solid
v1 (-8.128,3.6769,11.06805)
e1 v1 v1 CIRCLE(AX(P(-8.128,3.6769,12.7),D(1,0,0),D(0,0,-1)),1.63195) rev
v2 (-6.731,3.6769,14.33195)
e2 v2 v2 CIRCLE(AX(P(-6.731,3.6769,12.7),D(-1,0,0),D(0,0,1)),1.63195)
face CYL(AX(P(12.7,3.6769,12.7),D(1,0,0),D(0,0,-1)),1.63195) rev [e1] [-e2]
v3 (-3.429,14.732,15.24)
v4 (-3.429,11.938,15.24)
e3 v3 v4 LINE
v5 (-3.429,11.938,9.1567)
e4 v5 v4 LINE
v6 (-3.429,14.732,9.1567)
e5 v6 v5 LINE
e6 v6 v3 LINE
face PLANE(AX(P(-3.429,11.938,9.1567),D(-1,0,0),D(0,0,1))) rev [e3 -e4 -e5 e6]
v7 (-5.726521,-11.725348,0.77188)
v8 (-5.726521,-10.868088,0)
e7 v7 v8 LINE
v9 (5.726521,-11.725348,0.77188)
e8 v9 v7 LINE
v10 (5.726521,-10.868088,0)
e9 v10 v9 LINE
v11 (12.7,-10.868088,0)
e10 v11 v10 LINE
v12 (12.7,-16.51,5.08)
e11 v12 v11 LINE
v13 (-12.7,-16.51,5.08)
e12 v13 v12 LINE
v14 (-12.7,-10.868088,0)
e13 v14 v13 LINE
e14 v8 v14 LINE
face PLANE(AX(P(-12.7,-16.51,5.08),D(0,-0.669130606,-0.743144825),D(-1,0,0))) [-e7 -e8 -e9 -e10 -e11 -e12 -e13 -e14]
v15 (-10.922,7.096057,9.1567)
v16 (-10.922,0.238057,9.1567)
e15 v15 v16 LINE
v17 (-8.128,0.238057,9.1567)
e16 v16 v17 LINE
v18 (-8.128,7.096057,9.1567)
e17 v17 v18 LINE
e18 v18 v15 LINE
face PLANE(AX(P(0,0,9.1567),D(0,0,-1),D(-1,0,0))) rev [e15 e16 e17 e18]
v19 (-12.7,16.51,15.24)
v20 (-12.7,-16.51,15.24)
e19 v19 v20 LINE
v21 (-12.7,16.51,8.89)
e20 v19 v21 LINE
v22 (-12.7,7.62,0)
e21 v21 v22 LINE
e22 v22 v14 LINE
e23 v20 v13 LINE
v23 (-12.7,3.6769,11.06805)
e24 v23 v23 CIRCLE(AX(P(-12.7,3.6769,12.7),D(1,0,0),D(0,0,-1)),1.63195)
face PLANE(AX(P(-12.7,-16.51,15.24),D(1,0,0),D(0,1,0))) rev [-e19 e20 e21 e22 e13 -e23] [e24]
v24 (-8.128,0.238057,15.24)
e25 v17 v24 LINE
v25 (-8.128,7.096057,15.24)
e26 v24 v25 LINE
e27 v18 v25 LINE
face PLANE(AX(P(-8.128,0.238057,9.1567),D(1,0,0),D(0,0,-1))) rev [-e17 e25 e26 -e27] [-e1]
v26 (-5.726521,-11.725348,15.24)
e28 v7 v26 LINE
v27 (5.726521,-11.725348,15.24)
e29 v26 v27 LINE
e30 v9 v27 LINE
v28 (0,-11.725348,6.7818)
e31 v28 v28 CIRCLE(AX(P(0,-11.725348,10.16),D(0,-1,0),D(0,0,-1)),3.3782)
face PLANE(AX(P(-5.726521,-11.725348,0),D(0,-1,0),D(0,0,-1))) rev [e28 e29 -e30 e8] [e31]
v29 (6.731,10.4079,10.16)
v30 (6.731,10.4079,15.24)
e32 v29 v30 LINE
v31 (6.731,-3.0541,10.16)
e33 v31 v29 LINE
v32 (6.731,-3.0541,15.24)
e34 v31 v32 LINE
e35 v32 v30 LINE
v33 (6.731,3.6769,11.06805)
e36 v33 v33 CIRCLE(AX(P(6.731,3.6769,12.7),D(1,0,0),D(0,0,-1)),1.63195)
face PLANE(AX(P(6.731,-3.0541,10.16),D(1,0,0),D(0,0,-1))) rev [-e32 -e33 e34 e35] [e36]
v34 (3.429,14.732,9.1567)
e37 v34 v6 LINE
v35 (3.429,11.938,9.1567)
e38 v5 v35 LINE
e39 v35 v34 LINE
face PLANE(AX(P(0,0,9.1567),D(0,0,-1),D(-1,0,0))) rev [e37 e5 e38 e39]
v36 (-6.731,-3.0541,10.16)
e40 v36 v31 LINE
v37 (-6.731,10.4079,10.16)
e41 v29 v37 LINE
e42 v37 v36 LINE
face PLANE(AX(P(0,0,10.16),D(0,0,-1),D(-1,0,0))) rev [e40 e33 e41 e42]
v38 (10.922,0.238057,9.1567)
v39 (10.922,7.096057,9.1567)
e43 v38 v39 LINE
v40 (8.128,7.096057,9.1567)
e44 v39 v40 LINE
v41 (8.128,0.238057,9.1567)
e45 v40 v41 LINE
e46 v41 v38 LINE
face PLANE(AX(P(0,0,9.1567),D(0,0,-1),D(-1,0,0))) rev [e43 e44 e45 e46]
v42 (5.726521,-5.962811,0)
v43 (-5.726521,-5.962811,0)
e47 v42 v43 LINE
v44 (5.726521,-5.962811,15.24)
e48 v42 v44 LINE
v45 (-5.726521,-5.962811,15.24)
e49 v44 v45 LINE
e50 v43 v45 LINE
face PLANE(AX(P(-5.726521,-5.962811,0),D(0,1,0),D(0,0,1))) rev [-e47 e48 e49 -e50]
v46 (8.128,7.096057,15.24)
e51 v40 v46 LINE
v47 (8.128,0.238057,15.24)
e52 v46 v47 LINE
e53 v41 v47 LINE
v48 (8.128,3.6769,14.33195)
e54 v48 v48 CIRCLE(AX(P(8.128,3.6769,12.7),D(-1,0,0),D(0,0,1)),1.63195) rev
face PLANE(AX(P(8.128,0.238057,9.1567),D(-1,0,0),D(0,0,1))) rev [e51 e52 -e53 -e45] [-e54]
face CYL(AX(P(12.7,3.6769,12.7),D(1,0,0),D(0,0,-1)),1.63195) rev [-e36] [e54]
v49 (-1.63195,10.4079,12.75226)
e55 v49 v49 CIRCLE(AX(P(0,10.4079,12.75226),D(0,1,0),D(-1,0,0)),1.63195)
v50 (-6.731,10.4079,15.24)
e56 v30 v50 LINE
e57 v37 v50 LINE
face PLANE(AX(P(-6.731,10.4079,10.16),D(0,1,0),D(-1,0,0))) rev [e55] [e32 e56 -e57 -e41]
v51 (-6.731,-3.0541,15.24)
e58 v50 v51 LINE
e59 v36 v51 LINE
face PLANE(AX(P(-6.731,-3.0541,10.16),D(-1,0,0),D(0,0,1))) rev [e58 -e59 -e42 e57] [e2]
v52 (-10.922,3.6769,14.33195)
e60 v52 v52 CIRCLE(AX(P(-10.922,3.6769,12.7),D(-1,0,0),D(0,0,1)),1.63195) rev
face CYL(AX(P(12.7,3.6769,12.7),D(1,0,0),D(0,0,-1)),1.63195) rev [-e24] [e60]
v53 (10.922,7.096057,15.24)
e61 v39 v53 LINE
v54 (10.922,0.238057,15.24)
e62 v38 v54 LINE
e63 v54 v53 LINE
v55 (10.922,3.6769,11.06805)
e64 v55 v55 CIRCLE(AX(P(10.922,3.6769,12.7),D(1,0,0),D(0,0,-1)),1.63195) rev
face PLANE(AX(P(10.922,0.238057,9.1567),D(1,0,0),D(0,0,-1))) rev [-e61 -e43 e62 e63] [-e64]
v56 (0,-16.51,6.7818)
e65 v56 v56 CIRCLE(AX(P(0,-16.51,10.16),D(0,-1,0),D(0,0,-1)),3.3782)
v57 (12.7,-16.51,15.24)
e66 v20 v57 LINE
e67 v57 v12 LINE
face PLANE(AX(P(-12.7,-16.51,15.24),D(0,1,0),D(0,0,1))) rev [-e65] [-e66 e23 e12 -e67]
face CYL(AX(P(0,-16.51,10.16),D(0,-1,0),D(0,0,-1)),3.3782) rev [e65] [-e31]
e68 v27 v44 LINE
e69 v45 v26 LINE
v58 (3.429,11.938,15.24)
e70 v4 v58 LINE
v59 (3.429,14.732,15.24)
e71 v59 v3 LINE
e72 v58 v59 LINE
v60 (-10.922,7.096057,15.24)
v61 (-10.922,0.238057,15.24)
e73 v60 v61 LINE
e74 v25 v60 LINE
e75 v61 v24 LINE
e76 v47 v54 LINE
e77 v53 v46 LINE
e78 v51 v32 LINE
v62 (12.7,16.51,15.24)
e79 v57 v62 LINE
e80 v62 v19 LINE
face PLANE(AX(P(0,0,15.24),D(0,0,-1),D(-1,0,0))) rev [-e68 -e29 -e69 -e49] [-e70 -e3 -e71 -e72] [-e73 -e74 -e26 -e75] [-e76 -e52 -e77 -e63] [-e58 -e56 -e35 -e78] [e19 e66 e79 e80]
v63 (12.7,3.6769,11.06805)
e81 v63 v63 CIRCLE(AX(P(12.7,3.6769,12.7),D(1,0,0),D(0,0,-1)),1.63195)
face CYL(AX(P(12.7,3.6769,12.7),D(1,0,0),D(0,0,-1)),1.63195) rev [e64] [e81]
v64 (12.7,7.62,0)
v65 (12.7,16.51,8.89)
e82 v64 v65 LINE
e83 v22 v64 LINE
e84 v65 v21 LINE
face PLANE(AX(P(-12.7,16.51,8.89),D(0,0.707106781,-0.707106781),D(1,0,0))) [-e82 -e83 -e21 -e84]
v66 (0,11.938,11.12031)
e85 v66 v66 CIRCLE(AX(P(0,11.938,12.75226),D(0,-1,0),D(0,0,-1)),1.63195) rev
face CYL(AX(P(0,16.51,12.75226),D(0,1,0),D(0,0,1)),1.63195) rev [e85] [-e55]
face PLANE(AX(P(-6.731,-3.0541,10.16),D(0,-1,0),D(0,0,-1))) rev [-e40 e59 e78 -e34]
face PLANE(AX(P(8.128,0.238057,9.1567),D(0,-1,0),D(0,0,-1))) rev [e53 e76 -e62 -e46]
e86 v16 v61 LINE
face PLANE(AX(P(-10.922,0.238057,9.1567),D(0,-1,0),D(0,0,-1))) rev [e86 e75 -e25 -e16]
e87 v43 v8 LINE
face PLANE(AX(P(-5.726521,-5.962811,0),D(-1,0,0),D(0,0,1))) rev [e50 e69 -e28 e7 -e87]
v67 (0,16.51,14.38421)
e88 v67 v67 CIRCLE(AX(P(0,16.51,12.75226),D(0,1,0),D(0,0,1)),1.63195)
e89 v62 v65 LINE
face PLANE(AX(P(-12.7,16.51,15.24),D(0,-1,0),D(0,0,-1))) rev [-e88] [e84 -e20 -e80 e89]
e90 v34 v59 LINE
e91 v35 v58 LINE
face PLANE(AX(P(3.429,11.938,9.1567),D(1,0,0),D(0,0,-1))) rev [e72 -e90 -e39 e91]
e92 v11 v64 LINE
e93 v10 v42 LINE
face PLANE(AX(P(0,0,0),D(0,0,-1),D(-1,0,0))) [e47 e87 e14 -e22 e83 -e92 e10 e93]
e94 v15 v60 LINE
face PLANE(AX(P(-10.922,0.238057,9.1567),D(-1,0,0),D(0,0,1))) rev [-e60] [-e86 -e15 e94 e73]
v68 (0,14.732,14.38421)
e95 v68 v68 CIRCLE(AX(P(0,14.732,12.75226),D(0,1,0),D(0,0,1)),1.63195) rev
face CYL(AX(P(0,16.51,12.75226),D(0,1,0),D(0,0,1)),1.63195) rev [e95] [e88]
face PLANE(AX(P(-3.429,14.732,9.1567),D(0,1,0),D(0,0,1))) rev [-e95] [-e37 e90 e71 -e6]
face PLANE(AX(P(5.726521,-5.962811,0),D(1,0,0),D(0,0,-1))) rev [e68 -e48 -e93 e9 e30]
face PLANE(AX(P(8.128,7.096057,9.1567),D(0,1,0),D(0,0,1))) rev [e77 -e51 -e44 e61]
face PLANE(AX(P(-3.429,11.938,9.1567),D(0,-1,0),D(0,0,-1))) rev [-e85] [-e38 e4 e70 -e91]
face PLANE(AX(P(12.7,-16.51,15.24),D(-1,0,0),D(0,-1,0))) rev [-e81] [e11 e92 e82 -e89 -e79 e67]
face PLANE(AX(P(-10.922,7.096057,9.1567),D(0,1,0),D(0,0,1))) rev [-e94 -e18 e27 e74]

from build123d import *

# Parameters (mm, degrees)
SKETCH1_W                    = 25.4
SKETCH1_H                    = 33.02
BOSS_EXTRUDE1_DEPTH          = 15.24
SKETCH2_W                    = 13.462
SKETCH2_H                    = 13.462
CUT_EXTRUDE1_DEPTH           = 5.08
SKETCH3_W                    = 11.45304241
SKETCH3_H                    = 5.762537062
CUT_EXTRUDE2_DEPTH           = 26.80944982
CHAMFER1_SIZE                = 5.08
CHAMFER1_SIZE_2              = 5.641911575
F_1_4_CLEARANCE_HOLE1_REACH  = 40.521
F_1_4_CLEARANCE_HOLE1_BORE_R = 3.3782
F_4_CLEARANCE_HOLE1_D        = 3.2639
F_4_CLEARANCE_HOLE1_DEPTH    = 6.102100278
F_4_CLEARANCE_HOLE2_D        = 3.2639
CHAMFER2_SIZE                = 8.89
SKETCH11_W                   = 6.858
SKETCH11_H                   = 2.794
SKETCH11_W_2                 = 2.794
SKETCH11_H_2                 = 6.858
CUT_EXTRUDE3_DEPTH           = 6.0833


with BuildPart() as part:
    # Sketch1 → Boss-Extrude1 (new body)
    with BuildSketch(Plane.XY):
        Rectangle(SKETCH1_W, SKETCH1_H)
    extrude(amount=BOSS_EXTRUDE1_DEPTH)

    # Sketch2 → Cut-Extrude1 (cut)
    with BuildSketch(Plane.XY.offset(15.24)):
        with Locations((0, 3.676899722)):
            Rectangle(SKETCH2_W, SKETCH2_H)
    extrude(amount=-CUT_EXTRUDE1_DEPTH, mode=Mode.SUBTRACT)

    # Sketch3 → Cut-Extrude2 (cut, through all)
    with BuildSketch(Plane.XY.offset(15.24)):
        with Locations((0, -8.844079083)):
            Rectangle(SKETCH3_W, SKETCH3_H)
    extrude(amount=-CUT_EXTRUDE2_DEPTH, mode=Mode.SUBTRACT)

    # Chamfer1
    # the kernel refuses this chamfer: 5.641911575, 5.08 mm, written as the material it takes off along each edge
    with BuildSketch(Plane(origin=(-27.228960176, -16.51, 0), x_dir=(0, -0.03204434000819542, 0.9994864482690293), z_dir=(1, 0, 0))) as chamfer1_piece_1:
        Polygon((CHAMFER1_SIZE * 0.999486448269, -CHAMFER1_SIZE * 0.0320443400082), (-CHAMFER1_SIZE_2 * 0.0320443400101, -CHAMFER1_SIZE_2 * 0.999486448328), (0, 0), align=None)
    extrude(amount=54.457920352, mode=Mode.SUBTRACT)

    # 1/4 Clearance Hole1 bore → 1/4 Clearance Hole1 (cut, up to next)
    with BuildSketch(Plane(origin=(0, -16.51, 0), x_dir=(-1, 0, 0), z_dir=(0, -1, 0)), mode=Mode.PRIVATE) as f_1_4_clearance_hole1_sk1:
        with Locations((0, -10.16)):
            Circle(F_1_4_CLEARANCE_HOLE1_BORE_R)
    f_1_4_clearance_hole1_tool1 = extrude(f_1_4_clearance_hole1_sk1.sketch, amount=-F_1_4_CLEARANCE_HOLE1_REACH, mode=Mode.PRIVATE) & part.part
    add(f_1_4_clearance_hole1_tool1.solids().sort_by_distance((0, -16.51, 10.16))[0], mode=Mode.SUBTRACT)

    # #4 Clearance Hole1
    with Locations(Plane(origin=(0, 16.51, 0), x_dir=(1, 0, 0), z_dir=(0, 1, 0))):
        with Locations((0, -12.752259571)):
            Hole(F_4_CLEARANCE_HOLE1_D / 2, depth=F_4_CLEARANCE_HOLE1_DEPTH)

    # #4 Clearance Hole2 (through all)
    with Locations(Plane(origin=(12.7, 0, 0), x_dir=(0, 0, -1), z_dir=(1, 0, 0))):
        with Locations((-12.7, 3.676899722)):
            Hole(F_4_CLEARANCE_HOLE2_D / 2)

    # Chamfer2
    chamfer2_edges = [part.edges().sort_by_distance(p)[0] for p in [
        (0, 16.51, 0),
    ]]
    chamfer(chamfer2_edges, length=CHAMFER2_SIZE)

    # Sketch11 → Cut-Extrude3 (cut)
    with BuildSketch(Plane.XY.offset(15.24)):
        with Locations((0, 13.335)):
            Rectangle(SKETCH11_W, SKETCH11_H)
        with Locations((9.525, 3.667057181)):
            Rectangle(SKETCH11_W_2, SKETCH11_H_2)
        with Locations((-9.525, 3.667057181)):
            Rectangle(SKETCH11_W_2, SKETCH11_H_2)
    extrude(amount=-CUT_EXTRUDE3_DEPTH, mode=Mode.SUBTRACT)


solid = part.part
